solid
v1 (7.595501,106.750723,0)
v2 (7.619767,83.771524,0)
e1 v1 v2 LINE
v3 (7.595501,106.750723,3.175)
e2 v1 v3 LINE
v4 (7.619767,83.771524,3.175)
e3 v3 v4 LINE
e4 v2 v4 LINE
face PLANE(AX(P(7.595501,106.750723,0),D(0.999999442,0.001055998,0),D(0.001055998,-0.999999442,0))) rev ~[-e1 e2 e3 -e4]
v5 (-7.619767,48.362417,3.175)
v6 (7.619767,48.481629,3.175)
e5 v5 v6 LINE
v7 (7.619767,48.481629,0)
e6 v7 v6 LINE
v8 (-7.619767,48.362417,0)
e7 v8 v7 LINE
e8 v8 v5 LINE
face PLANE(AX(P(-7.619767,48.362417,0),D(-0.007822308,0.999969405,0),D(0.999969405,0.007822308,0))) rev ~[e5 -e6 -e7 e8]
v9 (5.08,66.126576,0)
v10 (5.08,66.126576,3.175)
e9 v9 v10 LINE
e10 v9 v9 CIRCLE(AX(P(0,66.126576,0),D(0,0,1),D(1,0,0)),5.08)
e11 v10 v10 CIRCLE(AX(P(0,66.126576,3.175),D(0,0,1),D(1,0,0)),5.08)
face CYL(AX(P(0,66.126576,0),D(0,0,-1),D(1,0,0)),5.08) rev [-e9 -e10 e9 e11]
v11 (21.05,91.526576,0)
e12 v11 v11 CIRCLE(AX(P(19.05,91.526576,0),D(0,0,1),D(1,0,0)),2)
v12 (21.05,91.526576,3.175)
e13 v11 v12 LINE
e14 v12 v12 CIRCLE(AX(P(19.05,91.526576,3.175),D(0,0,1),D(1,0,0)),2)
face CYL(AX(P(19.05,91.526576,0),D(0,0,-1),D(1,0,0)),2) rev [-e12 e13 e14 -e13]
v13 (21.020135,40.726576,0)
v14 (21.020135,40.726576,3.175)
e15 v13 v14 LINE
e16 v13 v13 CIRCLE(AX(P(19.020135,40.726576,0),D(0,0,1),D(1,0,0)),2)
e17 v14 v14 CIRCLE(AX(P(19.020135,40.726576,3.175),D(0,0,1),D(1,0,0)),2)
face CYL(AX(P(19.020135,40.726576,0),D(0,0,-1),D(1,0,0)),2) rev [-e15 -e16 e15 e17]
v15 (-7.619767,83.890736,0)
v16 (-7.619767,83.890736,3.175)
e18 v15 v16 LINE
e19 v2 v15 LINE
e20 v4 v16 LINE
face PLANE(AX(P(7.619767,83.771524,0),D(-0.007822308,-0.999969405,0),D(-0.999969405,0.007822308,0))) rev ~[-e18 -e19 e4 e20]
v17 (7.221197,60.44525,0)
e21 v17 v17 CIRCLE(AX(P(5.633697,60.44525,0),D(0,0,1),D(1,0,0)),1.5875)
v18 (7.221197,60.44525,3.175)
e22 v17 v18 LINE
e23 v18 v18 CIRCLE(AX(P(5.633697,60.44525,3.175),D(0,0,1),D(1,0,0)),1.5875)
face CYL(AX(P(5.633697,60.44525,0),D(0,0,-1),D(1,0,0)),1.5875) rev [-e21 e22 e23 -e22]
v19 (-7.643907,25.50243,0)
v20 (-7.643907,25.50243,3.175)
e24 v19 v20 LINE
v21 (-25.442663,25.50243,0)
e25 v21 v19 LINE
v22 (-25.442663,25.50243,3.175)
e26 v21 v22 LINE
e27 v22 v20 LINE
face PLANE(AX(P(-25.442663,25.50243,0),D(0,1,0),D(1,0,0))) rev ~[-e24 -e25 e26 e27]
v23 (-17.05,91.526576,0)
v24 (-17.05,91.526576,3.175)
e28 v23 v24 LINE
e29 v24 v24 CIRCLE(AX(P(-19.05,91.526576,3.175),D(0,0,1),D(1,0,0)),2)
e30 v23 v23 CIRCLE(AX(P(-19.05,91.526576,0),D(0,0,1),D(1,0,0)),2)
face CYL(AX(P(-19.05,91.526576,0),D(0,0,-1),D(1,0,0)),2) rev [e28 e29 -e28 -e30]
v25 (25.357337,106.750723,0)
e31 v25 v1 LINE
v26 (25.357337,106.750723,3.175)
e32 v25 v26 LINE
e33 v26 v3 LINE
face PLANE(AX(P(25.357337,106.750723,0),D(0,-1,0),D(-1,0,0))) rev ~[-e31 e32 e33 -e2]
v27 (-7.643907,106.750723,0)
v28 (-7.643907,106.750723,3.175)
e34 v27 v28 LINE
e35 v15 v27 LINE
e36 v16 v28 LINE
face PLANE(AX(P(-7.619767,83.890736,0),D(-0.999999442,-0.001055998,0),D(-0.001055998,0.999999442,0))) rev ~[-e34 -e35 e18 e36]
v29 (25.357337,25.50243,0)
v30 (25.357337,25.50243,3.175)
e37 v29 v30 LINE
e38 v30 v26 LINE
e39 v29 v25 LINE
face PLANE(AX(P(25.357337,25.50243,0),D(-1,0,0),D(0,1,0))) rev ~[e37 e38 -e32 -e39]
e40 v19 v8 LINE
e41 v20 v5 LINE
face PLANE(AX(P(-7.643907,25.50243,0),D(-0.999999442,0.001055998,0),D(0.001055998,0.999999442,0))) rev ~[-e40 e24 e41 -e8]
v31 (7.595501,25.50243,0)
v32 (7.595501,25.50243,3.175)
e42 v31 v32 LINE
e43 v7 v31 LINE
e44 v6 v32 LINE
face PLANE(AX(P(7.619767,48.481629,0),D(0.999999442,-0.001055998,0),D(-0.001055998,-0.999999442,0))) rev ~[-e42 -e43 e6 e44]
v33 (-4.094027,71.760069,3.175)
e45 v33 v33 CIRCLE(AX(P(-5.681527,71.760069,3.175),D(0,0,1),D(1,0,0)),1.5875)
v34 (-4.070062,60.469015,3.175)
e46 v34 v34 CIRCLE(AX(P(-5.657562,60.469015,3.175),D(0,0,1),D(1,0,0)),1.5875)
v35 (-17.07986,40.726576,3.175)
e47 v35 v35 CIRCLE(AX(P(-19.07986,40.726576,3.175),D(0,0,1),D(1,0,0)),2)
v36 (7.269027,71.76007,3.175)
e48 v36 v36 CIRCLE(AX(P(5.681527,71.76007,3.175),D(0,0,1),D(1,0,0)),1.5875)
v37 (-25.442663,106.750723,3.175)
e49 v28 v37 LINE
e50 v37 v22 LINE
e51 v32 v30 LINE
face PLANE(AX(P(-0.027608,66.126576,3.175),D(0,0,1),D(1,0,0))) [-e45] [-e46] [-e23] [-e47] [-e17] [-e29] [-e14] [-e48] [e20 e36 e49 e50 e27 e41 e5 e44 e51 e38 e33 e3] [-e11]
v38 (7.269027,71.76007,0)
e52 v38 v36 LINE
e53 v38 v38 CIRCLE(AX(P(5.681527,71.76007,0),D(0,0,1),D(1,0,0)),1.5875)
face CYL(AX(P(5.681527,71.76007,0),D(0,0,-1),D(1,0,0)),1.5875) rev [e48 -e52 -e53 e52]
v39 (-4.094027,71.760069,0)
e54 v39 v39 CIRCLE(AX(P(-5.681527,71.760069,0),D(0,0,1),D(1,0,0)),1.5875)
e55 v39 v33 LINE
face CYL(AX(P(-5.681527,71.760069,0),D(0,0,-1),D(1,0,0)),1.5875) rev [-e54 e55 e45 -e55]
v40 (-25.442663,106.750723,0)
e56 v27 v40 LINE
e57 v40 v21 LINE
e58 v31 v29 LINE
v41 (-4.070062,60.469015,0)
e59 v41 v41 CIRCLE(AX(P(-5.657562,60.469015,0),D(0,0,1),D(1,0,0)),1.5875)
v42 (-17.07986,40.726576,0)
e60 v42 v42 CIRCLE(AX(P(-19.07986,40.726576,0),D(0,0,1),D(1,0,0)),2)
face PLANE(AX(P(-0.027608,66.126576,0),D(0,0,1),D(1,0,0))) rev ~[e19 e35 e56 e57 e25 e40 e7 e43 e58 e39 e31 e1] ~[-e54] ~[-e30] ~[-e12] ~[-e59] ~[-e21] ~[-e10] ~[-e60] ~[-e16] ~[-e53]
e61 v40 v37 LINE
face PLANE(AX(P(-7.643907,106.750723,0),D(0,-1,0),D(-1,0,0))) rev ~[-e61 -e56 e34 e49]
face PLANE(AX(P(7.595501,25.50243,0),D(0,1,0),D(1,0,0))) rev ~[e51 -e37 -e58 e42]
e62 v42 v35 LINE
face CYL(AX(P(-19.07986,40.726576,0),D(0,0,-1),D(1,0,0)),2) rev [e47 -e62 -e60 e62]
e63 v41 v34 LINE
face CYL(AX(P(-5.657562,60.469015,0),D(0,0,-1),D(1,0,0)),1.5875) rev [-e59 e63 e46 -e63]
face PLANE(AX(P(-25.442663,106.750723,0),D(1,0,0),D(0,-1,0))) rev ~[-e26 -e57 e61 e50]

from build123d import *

# Parameters (mm, degrees)
F0_R     = 2
F0_R_2   = 1.5875
F0_R_3   = 5.08
F1_DEPTH = 3.175


# Not quite as in the source:
# - a feature names something its author has since deleted; it is built from what else it names


with BuildPart() as f1:
    # F0 (on Top) → F1 (new body)
    with BuildSketch(Plane.XY):
        Polygon((-25.4426629463, 106.7507229011), (-25.4426629463, 25.5024298209), (-7.6439069871, 25.5024298209), (-7.6197668711, 48.3624170749), (7.6197668654, 48.4816290427), (7.5955008617, 25.5024298209), (25.3573370537, 25.5024298209), (25.3573370537, 106.7507229011), (7.5955008617, 106.7507229011), (7.6197668654, 83.7715236793), (-7.6197668711, 83.8907356471), (-7.6439069871, 106.7507229011), align=None)
        with Locations((-19.0798602959, 40.726575638)):
            Circle(F0_R, mode=Mode.SUBTRACT)
        with Locations((-5.6575617589, 60.4690146843)):
            Circle(F0_R_2, mode=Mode.SUBTRACT)
        with Locations((19.0201352736, 40.726576361)):
            Circle(F0_R, mode=Mode.SUBTRACT)
        with Locations((5.6336971198, 60.4452502854)):
            Circle(F0_R_2, mode=Mode.SUBTRACT)
        with Locations((0, 66.126575638)):
            Circle(F0_R_3, mode=Mode.SUBTRACT)
        with Locations((-5.6815269438, 71.7600694551)):
            Circle(F0_R_2, mode=Mode.SUBTRACT)
        with Locations((-19.05, 91.526576114)):
            Circle(F0_R, mode=Mode.SUBTRACT)
        with Locations((5.6815266776, 71.7600697236)):
            Circle(F0_R_2, mode=Mode.SUBTRACT)
        with Locations((19.05, 91.526576361)):
            Circle(F0_R, mode=Mode.SUBTRACT)
    extrude(amount=F1_DEPTH)


solid = f1.part
